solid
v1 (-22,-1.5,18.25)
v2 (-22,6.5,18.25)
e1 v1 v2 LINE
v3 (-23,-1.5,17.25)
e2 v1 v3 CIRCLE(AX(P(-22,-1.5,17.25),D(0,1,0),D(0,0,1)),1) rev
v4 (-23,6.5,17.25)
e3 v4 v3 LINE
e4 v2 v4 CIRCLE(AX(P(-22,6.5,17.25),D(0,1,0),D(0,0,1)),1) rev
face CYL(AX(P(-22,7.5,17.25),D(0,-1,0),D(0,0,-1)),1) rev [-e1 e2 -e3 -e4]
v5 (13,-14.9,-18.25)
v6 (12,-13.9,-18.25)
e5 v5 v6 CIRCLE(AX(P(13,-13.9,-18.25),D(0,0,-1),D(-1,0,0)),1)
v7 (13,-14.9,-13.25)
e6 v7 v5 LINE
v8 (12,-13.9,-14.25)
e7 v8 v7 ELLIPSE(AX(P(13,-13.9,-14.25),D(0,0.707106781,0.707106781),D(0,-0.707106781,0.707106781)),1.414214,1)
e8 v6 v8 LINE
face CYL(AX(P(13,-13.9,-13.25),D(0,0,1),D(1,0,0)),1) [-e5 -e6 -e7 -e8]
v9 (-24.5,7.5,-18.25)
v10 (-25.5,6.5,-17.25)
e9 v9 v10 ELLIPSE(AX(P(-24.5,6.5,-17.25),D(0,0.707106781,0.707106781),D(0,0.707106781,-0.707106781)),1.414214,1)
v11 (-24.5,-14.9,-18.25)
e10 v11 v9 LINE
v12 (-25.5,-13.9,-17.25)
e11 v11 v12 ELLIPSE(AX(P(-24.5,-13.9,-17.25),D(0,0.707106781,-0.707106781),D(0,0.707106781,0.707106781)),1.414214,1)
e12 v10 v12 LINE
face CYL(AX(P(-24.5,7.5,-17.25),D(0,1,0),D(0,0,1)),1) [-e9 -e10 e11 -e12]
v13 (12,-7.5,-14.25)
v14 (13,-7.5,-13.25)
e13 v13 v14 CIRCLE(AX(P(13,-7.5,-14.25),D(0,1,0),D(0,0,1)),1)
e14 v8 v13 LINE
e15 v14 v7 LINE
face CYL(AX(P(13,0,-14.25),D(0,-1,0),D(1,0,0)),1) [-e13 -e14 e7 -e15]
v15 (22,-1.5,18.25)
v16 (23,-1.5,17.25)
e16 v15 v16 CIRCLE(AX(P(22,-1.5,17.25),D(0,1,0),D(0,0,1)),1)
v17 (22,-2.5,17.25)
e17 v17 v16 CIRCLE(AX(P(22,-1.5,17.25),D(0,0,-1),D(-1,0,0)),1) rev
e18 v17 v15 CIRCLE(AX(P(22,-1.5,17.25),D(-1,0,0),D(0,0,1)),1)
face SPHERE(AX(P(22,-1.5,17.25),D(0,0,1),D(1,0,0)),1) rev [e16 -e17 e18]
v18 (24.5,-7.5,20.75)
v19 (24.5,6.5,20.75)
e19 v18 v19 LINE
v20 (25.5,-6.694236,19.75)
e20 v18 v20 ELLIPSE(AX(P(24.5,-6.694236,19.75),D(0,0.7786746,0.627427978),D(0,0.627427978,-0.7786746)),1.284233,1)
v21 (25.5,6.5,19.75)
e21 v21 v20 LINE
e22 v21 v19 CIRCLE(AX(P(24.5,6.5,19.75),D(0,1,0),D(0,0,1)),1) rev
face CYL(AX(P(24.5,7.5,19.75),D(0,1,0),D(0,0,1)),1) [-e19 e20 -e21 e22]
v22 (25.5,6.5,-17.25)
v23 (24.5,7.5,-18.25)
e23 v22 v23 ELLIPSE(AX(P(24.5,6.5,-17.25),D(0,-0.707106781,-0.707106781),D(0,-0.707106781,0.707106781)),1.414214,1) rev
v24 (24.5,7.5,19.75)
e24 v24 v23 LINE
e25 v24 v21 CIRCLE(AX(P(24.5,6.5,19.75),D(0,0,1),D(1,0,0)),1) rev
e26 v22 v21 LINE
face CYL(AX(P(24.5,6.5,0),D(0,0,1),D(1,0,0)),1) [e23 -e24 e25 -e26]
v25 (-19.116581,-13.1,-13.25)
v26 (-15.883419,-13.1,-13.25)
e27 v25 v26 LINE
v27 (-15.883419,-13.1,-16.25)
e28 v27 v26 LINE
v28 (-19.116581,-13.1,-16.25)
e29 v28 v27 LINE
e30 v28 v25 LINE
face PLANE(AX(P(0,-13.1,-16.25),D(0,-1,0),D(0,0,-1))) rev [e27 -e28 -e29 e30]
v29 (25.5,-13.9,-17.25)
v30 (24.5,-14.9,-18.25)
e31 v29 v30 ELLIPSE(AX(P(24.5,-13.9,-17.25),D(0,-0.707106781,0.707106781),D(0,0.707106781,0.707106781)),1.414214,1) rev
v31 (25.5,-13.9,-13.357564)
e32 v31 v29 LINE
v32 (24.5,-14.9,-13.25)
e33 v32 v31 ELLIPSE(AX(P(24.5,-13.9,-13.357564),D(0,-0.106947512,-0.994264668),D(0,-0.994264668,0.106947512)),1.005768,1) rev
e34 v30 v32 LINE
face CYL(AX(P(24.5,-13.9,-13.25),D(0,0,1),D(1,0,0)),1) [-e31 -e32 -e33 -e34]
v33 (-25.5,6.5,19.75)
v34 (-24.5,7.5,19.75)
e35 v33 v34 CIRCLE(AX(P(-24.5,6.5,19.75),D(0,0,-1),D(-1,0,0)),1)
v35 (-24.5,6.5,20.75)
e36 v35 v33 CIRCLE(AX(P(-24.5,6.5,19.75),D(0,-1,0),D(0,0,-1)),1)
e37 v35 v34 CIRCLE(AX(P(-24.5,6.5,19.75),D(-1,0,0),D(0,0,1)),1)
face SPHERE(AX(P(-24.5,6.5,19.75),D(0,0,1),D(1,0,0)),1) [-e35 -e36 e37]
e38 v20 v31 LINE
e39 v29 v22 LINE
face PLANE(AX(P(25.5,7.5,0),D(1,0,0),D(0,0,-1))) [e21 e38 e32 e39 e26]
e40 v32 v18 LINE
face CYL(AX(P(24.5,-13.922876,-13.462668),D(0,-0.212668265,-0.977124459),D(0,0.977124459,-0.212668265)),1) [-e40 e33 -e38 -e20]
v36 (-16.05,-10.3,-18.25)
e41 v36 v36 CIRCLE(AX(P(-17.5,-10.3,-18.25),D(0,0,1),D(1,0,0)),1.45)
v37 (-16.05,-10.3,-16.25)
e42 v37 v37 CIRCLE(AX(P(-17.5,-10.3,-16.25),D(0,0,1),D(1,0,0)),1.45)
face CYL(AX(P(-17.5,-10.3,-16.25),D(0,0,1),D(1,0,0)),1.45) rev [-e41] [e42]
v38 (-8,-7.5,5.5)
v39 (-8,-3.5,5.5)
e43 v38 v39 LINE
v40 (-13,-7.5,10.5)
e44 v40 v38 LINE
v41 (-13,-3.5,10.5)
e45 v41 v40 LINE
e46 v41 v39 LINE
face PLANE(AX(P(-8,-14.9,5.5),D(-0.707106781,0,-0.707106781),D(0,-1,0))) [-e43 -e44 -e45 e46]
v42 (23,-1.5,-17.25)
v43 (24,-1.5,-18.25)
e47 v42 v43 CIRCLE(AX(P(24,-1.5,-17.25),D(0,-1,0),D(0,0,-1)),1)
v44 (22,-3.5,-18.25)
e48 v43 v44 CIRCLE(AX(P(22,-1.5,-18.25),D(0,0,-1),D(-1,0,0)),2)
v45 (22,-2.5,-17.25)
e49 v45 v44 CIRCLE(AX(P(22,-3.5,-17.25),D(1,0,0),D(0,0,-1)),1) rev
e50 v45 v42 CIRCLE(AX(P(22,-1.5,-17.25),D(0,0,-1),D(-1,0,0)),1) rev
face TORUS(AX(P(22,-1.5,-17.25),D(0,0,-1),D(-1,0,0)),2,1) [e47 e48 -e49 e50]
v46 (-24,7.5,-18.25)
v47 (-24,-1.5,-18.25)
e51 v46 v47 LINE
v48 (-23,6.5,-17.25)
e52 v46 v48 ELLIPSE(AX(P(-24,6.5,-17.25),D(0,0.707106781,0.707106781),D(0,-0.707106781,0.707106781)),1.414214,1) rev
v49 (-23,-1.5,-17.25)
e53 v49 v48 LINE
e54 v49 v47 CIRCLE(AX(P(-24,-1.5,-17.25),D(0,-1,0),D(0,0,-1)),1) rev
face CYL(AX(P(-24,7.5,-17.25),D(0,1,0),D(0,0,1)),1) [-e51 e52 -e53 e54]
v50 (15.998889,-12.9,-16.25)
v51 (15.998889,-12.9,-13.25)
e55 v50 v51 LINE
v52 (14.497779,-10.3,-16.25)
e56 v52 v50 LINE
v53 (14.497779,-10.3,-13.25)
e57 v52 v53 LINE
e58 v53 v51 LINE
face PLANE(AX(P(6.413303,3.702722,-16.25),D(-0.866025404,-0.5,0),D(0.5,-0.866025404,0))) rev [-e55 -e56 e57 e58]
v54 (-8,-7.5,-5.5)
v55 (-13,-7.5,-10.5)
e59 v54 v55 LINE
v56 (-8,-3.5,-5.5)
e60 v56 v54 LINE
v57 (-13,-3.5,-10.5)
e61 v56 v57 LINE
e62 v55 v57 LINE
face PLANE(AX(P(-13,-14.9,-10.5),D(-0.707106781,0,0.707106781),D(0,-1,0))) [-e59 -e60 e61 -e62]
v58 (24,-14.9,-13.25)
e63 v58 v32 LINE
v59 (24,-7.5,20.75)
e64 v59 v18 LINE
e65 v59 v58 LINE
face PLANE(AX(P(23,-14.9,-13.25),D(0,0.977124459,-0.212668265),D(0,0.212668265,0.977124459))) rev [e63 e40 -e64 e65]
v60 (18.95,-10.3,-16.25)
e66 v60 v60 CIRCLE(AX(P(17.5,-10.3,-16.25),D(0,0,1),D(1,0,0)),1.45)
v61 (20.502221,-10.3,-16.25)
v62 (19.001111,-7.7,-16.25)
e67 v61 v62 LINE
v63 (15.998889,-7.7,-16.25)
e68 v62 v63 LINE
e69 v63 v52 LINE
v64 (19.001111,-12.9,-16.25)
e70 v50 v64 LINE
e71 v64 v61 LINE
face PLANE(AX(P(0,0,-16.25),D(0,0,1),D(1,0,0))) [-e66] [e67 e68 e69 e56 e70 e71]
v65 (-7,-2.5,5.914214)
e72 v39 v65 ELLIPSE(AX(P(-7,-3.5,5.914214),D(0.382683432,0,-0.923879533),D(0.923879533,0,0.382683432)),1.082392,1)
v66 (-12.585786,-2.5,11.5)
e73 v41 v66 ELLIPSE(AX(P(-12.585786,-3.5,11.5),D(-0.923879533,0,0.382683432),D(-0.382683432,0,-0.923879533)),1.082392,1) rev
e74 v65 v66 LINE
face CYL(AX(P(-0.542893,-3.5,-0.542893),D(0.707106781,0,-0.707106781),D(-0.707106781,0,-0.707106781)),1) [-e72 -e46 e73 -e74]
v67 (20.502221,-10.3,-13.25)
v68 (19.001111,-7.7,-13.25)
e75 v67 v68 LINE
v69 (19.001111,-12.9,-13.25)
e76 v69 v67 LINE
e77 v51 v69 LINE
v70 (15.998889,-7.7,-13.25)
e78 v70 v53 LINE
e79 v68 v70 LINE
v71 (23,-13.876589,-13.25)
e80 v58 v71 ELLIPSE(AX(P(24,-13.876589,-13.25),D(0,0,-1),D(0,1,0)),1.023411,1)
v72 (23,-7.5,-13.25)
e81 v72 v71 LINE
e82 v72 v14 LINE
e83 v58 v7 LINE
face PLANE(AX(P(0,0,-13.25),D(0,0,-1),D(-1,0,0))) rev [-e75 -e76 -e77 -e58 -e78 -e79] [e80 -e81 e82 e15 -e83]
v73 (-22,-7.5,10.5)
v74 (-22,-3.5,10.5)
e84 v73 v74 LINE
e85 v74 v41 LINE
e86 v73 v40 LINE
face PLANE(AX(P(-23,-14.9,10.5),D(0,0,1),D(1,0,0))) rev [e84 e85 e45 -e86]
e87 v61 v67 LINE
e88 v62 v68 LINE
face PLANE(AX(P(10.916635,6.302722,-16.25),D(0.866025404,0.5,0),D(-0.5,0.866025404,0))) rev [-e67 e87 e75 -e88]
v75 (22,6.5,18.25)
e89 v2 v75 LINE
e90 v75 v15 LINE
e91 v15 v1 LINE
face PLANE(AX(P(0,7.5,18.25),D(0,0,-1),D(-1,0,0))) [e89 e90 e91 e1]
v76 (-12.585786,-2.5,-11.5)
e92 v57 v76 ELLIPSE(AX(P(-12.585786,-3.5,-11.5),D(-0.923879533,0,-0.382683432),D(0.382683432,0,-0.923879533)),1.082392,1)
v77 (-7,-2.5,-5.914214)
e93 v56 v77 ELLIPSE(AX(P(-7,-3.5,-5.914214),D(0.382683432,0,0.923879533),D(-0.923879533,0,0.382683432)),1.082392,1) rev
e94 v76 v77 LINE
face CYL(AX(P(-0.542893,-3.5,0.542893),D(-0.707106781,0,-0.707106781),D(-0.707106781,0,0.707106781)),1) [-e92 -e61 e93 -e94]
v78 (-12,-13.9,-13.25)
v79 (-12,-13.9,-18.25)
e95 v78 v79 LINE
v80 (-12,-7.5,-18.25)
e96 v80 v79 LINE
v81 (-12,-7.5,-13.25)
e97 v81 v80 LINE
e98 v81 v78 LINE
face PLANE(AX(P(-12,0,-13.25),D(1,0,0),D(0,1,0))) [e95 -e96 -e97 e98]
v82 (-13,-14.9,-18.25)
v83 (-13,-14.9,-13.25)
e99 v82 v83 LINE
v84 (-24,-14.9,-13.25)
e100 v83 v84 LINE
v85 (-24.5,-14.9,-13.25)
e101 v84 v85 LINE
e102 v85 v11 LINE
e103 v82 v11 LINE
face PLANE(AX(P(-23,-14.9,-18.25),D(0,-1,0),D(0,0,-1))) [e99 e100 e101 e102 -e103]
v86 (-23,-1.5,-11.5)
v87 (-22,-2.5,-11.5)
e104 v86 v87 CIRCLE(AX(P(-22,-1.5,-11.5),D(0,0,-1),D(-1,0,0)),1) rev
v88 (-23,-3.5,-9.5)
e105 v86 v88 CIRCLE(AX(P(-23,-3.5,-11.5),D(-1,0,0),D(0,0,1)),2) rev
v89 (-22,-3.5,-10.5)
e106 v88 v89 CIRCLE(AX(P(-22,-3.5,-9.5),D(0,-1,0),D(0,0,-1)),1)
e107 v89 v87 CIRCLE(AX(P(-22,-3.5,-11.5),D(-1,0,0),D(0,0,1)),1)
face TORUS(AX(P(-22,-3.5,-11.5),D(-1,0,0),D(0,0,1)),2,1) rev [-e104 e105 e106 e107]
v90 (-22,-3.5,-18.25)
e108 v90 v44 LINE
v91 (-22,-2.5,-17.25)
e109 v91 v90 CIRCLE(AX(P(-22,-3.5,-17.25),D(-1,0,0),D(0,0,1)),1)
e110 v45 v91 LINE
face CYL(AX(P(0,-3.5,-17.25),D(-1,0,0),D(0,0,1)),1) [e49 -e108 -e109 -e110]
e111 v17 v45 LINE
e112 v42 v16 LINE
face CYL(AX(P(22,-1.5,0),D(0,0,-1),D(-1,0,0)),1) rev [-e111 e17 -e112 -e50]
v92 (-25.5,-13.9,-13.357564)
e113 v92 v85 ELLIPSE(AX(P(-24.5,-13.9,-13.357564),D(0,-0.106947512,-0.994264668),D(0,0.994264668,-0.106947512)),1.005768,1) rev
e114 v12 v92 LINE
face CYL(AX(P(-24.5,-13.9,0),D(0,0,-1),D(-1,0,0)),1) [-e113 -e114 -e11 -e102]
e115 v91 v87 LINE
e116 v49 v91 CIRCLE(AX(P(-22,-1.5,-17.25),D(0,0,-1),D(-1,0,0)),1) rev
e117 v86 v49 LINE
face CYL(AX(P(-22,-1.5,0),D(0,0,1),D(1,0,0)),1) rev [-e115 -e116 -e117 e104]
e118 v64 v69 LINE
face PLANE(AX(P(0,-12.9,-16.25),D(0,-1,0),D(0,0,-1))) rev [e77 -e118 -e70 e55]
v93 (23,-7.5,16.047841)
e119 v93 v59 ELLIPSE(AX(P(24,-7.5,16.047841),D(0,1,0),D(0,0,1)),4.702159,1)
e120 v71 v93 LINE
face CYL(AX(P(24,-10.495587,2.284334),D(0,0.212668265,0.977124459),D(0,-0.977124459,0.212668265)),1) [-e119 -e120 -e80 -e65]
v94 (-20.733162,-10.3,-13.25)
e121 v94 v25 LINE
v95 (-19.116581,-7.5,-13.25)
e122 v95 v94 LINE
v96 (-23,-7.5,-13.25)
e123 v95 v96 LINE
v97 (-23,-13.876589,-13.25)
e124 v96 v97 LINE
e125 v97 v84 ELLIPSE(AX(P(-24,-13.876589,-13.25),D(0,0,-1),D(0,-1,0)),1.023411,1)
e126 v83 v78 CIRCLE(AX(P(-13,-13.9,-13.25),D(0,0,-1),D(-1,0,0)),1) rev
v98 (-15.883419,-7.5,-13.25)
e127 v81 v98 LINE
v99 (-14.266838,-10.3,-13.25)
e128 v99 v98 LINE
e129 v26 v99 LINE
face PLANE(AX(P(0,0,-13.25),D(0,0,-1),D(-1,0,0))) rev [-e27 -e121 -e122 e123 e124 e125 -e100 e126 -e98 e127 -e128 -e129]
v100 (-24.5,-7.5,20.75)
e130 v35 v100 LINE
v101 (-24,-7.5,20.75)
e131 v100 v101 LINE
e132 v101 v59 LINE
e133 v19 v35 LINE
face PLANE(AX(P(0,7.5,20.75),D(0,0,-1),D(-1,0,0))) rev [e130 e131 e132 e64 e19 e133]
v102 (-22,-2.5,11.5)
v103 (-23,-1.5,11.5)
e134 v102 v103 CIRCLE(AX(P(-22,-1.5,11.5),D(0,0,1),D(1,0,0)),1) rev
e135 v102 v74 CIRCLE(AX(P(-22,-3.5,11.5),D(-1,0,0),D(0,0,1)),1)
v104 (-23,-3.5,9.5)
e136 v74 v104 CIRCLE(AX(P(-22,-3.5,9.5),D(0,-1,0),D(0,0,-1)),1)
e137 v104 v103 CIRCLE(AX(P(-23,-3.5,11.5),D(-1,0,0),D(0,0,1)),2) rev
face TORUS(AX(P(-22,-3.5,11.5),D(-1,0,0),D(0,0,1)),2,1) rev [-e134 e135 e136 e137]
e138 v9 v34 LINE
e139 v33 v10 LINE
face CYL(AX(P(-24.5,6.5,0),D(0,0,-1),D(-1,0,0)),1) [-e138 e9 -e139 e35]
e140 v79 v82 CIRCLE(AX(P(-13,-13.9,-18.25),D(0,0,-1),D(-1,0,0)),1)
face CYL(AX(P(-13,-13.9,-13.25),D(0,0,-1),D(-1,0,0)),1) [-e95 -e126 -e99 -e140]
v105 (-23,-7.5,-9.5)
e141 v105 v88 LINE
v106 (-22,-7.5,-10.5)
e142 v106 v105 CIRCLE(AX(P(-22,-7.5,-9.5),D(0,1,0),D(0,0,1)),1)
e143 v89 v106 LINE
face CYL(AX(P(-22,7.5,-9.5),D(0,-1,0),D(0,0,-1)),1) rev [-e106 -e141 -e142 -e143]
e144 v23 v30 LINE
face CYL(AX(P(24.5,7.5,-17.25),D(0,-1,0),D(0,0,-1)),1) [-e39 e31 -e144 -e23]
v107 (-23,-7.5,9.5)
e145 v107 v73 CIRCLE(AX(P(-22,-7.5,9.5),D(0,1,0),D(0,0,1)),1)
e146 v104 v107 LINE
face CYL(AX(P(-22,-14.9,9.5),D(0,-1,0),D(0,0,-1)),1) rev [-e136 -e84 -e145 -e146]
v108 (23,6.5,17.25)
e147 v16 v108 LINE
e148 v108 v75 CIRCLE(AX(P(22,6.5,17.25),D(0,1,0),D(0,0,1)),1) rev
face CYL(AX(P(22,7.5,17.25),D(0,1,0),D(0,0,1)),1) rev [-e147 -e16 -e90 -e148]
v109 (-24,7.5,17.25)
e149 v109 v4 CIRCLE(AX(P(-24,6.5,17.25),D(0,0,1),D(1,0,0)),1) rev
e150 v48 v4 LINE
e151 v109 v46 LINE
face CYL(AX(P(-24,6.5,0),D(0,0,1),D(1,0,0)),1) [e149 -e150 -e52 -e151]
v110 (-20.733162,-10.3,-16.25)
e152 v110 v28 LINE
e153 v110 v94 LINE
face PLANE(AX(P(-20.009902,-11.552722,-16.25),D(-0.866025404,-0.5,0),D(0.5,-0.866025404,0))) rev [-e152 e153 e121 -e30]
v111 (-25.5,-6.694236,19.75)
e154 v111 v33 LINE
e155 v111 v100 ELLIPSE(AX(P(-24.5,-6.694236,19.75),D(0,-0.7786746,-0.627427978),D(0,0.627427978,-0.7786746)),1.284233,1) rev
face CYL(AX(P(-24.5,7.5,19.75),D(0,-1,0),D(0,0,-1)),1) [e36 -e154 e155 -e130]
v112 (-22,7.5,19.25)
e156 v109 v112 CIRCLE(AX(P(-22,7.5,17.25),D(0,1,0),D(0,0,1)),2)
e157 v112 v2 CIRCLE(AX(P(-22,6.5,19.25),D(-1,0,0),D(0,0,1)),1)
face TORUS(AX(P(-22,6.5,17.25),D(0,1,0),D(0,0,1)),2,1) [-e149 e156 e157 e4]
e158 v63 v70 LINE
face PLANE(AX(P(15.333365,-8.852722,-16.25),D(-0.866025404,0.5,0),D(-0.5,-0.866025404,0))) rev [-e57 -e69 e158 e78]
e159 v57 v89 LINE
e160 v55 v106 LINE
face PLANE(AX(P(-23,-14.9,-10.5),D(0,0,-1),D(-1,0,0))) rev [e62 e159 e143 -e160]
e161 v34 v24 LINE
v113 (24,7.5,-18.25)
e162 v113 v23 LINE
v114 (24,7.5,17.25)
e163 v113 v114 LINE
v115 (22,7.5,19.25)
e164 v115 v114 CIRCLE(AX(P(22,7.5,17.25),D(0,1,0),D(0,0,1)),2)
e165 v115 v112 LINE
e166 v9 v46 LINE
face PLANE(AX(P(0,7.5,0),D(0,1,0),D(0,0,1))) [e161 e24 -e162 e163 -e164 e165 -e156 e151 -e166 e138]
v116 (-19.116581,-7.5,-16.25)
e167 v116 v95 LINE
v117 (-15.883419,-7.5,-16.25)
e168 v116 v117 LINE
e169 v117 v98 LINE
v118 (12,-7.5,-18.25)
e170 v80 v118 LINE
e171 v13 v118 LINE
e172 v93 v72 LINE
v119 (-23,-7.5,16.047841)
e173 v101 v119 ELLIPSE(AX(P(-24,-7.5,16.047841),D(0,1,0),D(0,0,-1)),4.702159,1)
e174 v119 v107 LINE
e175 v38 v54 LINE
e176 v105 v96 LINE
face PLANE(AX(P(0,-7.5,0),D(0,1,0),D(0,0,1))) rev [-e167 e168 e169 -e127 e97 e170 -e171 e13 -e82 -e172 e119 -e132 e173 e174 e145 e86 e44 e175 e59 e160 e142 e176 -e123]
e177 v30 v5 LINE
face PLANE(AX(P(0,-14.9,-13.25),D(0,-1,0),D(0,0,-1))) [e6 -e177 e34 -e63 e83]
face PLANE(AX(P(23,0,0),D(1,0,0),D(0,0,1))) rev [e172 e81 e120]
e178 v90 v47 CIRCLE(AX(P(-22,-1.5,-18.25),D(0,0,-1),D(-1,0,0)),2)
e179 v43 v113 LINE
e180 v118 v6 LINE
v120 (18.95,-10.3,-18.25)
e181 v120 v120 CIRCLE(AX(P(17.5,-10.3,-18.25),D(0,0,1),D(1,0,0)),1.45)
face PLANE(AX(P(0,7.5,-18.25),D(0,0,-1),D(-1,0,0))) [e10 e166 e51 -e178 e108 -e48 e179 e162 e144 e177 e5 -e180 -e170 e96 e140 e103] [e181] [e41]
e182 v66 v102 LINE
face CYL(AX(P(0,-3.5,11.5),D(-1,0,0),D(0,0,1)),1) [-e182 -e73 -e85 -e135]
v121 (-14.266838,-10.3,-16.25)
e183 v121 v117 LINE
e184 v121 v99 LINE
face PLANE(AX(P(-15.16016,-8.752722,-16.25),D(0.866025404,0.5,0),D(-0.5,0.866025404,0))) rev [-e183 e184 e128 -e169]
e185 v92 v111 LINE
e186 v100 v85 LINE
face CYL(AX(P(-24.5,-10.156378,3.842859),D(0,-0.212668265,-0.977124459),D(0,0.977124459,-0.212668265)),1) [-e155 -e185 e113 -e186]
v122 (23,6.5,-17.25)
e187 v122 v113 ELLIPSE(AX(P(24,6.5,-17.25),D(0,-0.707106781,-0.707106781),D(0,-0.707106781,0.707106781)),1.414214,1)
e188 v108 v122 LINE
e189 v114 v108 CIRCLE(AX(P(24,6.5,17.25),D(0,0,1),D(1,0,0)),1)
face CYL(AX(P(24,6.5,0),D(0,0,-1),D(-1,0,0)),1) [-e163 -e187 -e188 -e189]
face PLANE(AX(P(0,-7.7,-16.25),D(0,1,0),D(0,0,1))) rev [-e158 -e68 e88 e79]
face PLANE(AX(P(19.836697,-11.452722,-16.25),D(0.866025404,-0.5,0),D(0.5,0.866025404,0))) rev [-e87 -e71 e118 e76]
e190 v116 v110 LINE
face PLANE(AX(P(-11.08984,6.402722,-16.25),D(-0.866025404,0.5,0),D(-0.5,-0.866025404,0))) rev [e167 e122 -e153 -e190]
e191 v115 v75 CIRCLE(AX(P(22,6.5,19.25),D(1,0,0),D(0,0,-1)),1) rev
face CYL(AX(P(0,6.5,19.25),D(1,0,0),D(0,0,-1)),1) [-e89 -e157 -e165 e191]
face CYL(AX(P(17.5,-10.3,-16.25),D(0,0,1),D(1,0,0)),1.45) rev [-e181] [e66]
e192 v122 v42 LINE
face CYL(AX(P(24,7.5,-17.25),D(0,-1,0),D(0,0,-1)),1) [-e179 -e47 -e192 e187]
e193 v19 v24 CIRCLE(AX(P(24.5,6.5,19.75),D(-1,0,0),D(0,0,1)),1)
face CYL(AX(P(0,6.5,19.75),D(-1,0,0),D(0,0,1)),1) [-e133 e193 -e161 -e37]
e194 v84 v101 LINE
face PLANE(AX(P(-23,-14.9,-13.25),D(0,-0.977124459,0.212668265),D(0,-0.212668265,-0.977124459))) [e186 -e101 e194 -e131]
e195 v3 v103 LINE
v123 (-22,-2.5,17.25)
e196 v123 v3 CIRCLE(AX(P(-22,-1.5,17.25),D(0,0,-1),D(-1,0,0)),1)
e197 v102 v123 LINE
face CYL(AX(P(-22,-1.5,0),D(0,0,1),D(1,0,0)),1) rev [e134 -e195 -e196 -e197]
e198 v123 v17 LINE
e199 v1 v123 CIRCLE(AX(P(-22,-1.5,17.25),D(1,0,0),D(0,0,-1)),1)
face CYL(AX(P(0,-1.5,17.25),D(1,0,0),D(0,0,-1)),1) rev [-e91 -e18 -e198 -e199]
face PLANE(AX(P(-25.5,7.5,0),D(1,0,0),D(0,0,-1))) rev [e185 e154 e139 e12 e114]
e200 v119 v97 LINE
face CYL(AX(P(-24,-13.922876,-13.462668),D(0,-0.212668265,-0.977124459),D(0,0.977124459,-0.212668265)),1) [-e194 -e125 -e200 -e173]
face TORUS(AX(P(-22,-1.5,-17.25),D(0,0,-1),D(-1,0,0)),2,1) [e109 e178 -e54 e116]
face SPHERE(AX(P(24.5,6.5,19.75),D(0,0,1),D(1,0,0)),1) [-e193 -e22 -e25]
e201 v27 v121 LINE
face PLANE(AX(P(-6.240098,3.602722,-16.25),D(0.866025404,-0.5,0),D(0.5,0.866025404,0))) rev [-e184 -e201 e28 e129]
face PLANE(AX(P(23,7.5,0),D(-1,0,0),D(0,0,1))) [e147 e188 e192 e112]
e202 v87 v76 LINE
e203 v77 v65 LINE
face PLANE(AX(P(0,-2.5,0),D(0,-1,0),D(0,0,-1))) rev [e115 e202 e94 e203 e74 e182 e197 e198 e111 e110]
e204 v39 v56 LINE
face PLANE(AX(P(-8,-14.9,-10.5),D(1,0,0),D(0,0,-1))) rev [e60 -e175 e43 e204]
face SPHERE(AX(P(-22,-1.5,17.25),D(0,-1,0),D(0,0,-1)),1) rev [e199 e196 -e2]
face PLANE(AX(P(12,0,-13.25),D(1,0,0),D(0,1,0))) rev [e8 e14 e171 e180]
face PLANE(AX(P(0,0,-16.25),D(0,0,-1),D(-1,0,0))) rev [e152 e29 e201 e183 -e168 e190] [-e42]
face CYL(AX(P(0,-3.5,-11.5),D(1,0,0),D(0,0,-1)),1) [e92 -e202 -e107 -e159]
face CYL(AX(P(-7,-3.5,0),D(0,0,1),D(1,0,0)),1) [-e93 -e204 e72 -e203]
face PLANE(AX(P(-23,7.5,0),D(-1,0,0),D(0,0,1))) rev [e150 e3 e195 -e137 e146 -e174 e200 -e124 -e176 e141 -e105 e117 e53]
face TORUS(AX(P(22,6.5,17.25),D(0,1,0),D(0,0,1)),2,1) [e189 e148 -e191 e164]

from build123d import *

# Parameters (mm, degrees)
BOSS_EXTRUDE1_DEPTH     = 7.5
BOSS_EXTRUDE2_START     = -7.5
SKETCH1_3_W             = 46
SKETCH1_3_H             = 36.5
BOSS_EXTRUDE2_DEPTH     = 5
BOSS_EXTRUDE3_DEPTH     = 2.5
BOSS_EXTRUDE4_DEPTH     = 5
CUT_EXTRUDE1_START      = -5
CUT_EXTRUDE1_DEPTH      = 3
M2_5_CLEARANCE_HOLE1_D  = 2.9
MIRROR1_START           = -16.25
MIRROR1_DEPTH           = 3
MIRROR1_START_2         = -18.25
MIRROR1_2_DEPTH         = 5
MIRROR1_3_OUTLINE_R     = 1.45
MIRROR1_3_DEPTH         = 2
MIRROR1_START_3         = 23
MIRROR1_4_DEPTH         = 2.5
CUT_EXTRUDE2_DEPTH      = 37.094632565
CUT_EXTRUDE2_DEPTH_BACK = 37.094632565
SKETCH10_W              = 15
SKETCH10_H              = 21
CHAMFER1_SIZE           = 5
FILLET1_R               = 1
FILLET2_R               = 1
FILLET6_R               = 1
FILLET7_R               = 1
FILLET8_R               = 1


with BuildPart() as part:
    # Sketch1 → Boss-Extrude1 (new, symmetric)
    with BuildSketch(Plane(origin=(0, 0, 0), x_dir=(1, 0, 0), z_dir=(0, 1, 0))):
        Polygon((23, -18.25), (-23, -18.25), (-23, 18.25), (-25.5, 18.25), (-25.5, -20.75), (25.5, -20.75), (25.5, 18.25), (23, 18.25), align=None)
    extrude(amount=BOSS_EXTRUDE1_DEPTH, both=True)

    # Sketch1<3> → Boss-Extrude2 (add)
    with BuildSketch(Plane(origin=(0, 0, 0), x_dir=(1, 0, 0), z_dir=(0, 1, 0)).offset(BOSS_EXTRUDE2_START)):
        Rectangle(SKETCH1_3_W, SKETCH1_3_H)
    extrude(amount=BOSS_EXTRUDE2_DEPTH)

    # Sketch5 → Boss-Extrude3 (add)
    with BuildSketch(Plane(origin=(-25.5, 32.25, 0), x_dir=(0, 1, 0), z_dir=(-1, 0, 0))):
        Polygon((-47.15, 18.25), (-39.75, 18.25), (-39.75, -20.75), (-47.15, 13.25), align=None)
    extrude(amount=-BOSS_EXTRUDE3_DEPTH)

    # Sketch6 → Boss-Extrude4 (add)
    with BuildSketch(Plane(origin=(0, 0, -18.25), x_dir=(-1, 0, 0), z_dir=(0, 0, -1))):
        Polygon((-12, -10.3), (-14.266838493, -10.3), (-15.883419246, -13.1), (-19.116580754, -13.1), (-20.733161507, -10.3), (-19.116580754, -7.5), (-23, -7.5), (-23, -14.9), (-12, -14.9), align=None)
        Polygon((23, -7.5), (12, -7.5), (12, -10.3), (12, -14.9), (23, -14.9), align=None)
    extrude(amount=-BOSS_EXTRUDE4_DEPTH)

    # Sketch6<3> → Cut-Extrude1 (cut)
    with BuildSketch(Plane(origin=(0, 0, -18.25), x_dir=(-1, 0, 0), z_dir=(0, 0, -1)).offset(CUT_EXTRUDE1_START)):
        Polygon((19.0011107, -7.7), (15.9988893, -7.7), (14.4977786, -10.3), (15.9988893, -12.9), (19.0011107, -12.9), (20.5022214, -10.3), align=None)
    extrude(amount=CUT_EXTRUDE1_DEPTH, mode=Mode.SUBTRACT)

    # M2.5 Clearance Hole1 (through all)
    with Locations(Plane.XY.offset(-16.25)):
        with Locations((-17.5, -10.3), (17.5, -10.3)):
            Hole(M2_5_CLEARANCE_HOLE1_D / 2)

    # Mirror1: read off the stored shape, not the designer's step
    # Mirror1 outline → Mirror1 (cut)
    with BuildSketch(Plane.XY.offset(MIRROR1_START)):
        Polygon((-14.266838493, -10.3), (-15.883419246, -7.5), (-19.116580754, -7.5), (-20.733161507, -10.3), (-19.116580754, -13.1), (-15.883419246, -13.1), align=None)
        Polygon((-15.9988893, -12.9), (-19.0011107, -12.9), (-20.5022214, -10.3), (-19.0011107, -7.7), (-15.9988893, -7.7), (-14.4977786, -10.3), align=None, mode=Mode.SUBTRACT)
    extrude(amount=MIRROR1_DEPTH, mode=Mode.SUBTRACT)

    # Mirror1 2 outline → Mirror1 2 (add)
    with BuildSketch(Plane.XY.offset(MIRROR1_START_2)):
        Polygon((20.733161507, -10.3), (19.116580754, -7.5), (12, -7.5), (12, -10.3), (14.266838493, -10.3), (15.883419246, -13.1), (19.116580754, -13.1), align=None)
        Polygon((15.9988893, -7.7), (19.0011107, -7.7), (20.5022214, -10.3), (19.0011107, -12.9), (15.9988893, -12.9), (14.4977786, -10.3), align=None, mode=Mode.SUBTRACT)
    extrude(amount=MIRROR1_2_DEPTH)

    # Mirror1 3 outline → Mirror1 3 (add)
    with BuildSketch(Plane.XY.offset(MIRROR1_START_2)):
        Polygon((20.5022214, -10.3), (19.0011107, -7.7), (15.9988893, -7.7), (14.4977786, -10.3), (15.9988893, -12.9), (19.0011107, -12.9), align=None)
        with Locations((17.5, -10.3)):
            Circle(MIRROR1_3_OUTLINE_R, mode=Mode.SUBTRACT)
    extrude(amount=MIRROR1_3_DEPTH)

    # Mirror1 4 outline → Mirror1 4 (add)
    with BuildSketch(Plane.YZ.offset(MIRROR1_START_3)):
        Polygon((-14.9, -13.25), (-14.9, -18.25), (-7.5, -18.25), (-7.5, 20.75), align=None)
    extrude(amount=MIRROR1_4_DEPTH)

    # Sketch10 → Cut-Extrude2 (cut, two sides: drawn at the far end of the back side and taken through both)
    with BuildSketch(Plane(origin=(0, 0, 0), x_dir=(1, 0, 0), z_dir=(0, 1, 0)).offset(-CUT_EXTRUDE2_DEPTH_BACK)):
        with Locations((-15.5, 0)):
            Rectangle(SKETCH10_W, SKETCH10_H)
    extrude(amount=CUT_EXTRUDE2_DEPTH + CUT_EXTRUDE2_DEPTH_BACK, mode=Mode.SUBTRACT)

    # Chamfer1
    chamfer1_edges = [part.edges().sort_by_distance(p)[0] for p in [
        (-8, -5, -10.5),
        (-8, -5, 10.5),
    ]]
    chamfer(chamfer1_edges, length=CHAMFER1_SIZE)

    # Fillet1
    fillet1_edges = [part.edges().sort_by_distance(p)[0] for p in [
        (23, 7.5, 0),
        (-23, 2.5, -18.25),
        (-23, 2.5, 18.25),
        (23, 2.5, 18.25),
        (23, 2.5, -18.25),
        (0, 7.5, 18.25),
        (-23, 7.5, 0),
        (-23, -2.5, -14.375),
        (-18, -2.5, -10.5),
        (-23, -5, -10.5),
        (-23, -5, 10.5),
        (-8, -2.5, 0),
        (-18, -2.5, 10.5),
        (-23, -2.5, 14.375),
        (-10.5, -2.5, 8),
        (-10.5, -2.5, -8),
        (0, -2.5, -18.25),
        (0, -2.5, 18.25),
        (23, -2.5, 0),
    ]]
    fillet(fillet1_edges, radius=FILLET1_R)

    # Fillet2
    fillet2_edges = [part.edges().sort_by_distance(p)[0] for p in [
        (25.5, -14.9, -15.75),
        (25.5, -11.2, 3.75),
        (25.5, 0, 20.75),
        (-25.5, 0, 20.75),
        (-25.5, -3.7, -18.25),
        (25.5, -3.7, -18.25),
        (-25.5, 7.5, 1.25),
        (-25.5, -14.9, -15.75),
        (-25.5, -11.2, 3.75),
        (25.5, 7.5, 1.25),
    ]]
    fillet(fillet2_edges, radius=FILLET2_R)

    # Fillet6
    fillet6_edges = [part.edges().sort_by_distance(p)[0] for p in [
        (-12, -14.9, -15.75),
        (12, -14.9, -15.75),
        (12, -11.2, -13.25),
    ]]
    fillet(fillet6_edges, radius=FILLET6_R)

    # Fillet7
    # the kernel refuses this fillet: 1 mm, written as the material it takes off along each edge
    with BuildSketch(Plane(origin=(24.5, 6.5, 19.75), x_dir=(0, 0, 1), z_dir=(0, 1, 0))) as fillet7_piece_1_section:
        Polygon((0, 0), (FILLET7_R, 0), (FILLET7_R, FILLET7_R), (0, FILLET7_R), align=None)
    fillet7_piece_1 = extrude(amount=FILLET7_R, mode=Mode.PRIVATE)
    fillet7_piece_1 = fillet7_piece_1 - Plane(origin=(24.5, 6.5, 19.75), x_dir=(-0.7071067811865476, 0, -0.7071067811865475), z_dir=(0, 1, 0)) * Sphere(FILLET7_R, mode=Mode.PRIVATE)
    add(fillet7_piece_1, mode=Mode.SUBTRACT)
    with BuildSketch(Plane(origin=(-24.5, 6.5, 19.75), x_dir=(0, 0, 1), z_dir=(0, 1, 0))) as fillet7_piece_2_section:
        Polygon((0, 0), (FILLET7_R, 0), (FILLET7_R, -FILLET7_R), (0, -FILLET7_R), align=None)
    fillet7_piece_2 = extrude(amount=FILLET7_R, mode=Mode.PRIVATE)
    fillet7_piece_2 = fillet7_piece_2 - Plane(origin=(-24.5, 6.5, 19.75), x_dir=(0.7071067811865475, 0, -0.7071067811865475), z_dir=(0, 1, 0)) * Sphere(FILLET7_R, mode=Mode.PRIVATE)
    add(fillet7_piece_2, mode=Mode.SUBTRACT)
    with BuildSketch(Plane(origin=(-24.5, 7.5, 20.75), x_dir=(0, 0, -1), z_dir=(1, 0, 0))) as fillet7_piece_3:
        with BuildLine():
            CenterArc((FILLET7_R, -FILLET7_R), FILLET7_R, 90, 90)
            Line((0, -FILLET7_R), (0, 0))
            Line((0, 0), (FILLET7_R, 0))
        make_face()
    extrude(amount=49, mode=Mode.SUBTRACT)

    # Fillet8
    fillet8_edges = [part.edges().sort_by_distance(p)[0] for p in [
        (23, -11.2, 3.75),
        (-23, -11.2, 3.75),
    ]]
    fillet(fillet8_edges, radius=FILLET8_R)


solid = part.part
